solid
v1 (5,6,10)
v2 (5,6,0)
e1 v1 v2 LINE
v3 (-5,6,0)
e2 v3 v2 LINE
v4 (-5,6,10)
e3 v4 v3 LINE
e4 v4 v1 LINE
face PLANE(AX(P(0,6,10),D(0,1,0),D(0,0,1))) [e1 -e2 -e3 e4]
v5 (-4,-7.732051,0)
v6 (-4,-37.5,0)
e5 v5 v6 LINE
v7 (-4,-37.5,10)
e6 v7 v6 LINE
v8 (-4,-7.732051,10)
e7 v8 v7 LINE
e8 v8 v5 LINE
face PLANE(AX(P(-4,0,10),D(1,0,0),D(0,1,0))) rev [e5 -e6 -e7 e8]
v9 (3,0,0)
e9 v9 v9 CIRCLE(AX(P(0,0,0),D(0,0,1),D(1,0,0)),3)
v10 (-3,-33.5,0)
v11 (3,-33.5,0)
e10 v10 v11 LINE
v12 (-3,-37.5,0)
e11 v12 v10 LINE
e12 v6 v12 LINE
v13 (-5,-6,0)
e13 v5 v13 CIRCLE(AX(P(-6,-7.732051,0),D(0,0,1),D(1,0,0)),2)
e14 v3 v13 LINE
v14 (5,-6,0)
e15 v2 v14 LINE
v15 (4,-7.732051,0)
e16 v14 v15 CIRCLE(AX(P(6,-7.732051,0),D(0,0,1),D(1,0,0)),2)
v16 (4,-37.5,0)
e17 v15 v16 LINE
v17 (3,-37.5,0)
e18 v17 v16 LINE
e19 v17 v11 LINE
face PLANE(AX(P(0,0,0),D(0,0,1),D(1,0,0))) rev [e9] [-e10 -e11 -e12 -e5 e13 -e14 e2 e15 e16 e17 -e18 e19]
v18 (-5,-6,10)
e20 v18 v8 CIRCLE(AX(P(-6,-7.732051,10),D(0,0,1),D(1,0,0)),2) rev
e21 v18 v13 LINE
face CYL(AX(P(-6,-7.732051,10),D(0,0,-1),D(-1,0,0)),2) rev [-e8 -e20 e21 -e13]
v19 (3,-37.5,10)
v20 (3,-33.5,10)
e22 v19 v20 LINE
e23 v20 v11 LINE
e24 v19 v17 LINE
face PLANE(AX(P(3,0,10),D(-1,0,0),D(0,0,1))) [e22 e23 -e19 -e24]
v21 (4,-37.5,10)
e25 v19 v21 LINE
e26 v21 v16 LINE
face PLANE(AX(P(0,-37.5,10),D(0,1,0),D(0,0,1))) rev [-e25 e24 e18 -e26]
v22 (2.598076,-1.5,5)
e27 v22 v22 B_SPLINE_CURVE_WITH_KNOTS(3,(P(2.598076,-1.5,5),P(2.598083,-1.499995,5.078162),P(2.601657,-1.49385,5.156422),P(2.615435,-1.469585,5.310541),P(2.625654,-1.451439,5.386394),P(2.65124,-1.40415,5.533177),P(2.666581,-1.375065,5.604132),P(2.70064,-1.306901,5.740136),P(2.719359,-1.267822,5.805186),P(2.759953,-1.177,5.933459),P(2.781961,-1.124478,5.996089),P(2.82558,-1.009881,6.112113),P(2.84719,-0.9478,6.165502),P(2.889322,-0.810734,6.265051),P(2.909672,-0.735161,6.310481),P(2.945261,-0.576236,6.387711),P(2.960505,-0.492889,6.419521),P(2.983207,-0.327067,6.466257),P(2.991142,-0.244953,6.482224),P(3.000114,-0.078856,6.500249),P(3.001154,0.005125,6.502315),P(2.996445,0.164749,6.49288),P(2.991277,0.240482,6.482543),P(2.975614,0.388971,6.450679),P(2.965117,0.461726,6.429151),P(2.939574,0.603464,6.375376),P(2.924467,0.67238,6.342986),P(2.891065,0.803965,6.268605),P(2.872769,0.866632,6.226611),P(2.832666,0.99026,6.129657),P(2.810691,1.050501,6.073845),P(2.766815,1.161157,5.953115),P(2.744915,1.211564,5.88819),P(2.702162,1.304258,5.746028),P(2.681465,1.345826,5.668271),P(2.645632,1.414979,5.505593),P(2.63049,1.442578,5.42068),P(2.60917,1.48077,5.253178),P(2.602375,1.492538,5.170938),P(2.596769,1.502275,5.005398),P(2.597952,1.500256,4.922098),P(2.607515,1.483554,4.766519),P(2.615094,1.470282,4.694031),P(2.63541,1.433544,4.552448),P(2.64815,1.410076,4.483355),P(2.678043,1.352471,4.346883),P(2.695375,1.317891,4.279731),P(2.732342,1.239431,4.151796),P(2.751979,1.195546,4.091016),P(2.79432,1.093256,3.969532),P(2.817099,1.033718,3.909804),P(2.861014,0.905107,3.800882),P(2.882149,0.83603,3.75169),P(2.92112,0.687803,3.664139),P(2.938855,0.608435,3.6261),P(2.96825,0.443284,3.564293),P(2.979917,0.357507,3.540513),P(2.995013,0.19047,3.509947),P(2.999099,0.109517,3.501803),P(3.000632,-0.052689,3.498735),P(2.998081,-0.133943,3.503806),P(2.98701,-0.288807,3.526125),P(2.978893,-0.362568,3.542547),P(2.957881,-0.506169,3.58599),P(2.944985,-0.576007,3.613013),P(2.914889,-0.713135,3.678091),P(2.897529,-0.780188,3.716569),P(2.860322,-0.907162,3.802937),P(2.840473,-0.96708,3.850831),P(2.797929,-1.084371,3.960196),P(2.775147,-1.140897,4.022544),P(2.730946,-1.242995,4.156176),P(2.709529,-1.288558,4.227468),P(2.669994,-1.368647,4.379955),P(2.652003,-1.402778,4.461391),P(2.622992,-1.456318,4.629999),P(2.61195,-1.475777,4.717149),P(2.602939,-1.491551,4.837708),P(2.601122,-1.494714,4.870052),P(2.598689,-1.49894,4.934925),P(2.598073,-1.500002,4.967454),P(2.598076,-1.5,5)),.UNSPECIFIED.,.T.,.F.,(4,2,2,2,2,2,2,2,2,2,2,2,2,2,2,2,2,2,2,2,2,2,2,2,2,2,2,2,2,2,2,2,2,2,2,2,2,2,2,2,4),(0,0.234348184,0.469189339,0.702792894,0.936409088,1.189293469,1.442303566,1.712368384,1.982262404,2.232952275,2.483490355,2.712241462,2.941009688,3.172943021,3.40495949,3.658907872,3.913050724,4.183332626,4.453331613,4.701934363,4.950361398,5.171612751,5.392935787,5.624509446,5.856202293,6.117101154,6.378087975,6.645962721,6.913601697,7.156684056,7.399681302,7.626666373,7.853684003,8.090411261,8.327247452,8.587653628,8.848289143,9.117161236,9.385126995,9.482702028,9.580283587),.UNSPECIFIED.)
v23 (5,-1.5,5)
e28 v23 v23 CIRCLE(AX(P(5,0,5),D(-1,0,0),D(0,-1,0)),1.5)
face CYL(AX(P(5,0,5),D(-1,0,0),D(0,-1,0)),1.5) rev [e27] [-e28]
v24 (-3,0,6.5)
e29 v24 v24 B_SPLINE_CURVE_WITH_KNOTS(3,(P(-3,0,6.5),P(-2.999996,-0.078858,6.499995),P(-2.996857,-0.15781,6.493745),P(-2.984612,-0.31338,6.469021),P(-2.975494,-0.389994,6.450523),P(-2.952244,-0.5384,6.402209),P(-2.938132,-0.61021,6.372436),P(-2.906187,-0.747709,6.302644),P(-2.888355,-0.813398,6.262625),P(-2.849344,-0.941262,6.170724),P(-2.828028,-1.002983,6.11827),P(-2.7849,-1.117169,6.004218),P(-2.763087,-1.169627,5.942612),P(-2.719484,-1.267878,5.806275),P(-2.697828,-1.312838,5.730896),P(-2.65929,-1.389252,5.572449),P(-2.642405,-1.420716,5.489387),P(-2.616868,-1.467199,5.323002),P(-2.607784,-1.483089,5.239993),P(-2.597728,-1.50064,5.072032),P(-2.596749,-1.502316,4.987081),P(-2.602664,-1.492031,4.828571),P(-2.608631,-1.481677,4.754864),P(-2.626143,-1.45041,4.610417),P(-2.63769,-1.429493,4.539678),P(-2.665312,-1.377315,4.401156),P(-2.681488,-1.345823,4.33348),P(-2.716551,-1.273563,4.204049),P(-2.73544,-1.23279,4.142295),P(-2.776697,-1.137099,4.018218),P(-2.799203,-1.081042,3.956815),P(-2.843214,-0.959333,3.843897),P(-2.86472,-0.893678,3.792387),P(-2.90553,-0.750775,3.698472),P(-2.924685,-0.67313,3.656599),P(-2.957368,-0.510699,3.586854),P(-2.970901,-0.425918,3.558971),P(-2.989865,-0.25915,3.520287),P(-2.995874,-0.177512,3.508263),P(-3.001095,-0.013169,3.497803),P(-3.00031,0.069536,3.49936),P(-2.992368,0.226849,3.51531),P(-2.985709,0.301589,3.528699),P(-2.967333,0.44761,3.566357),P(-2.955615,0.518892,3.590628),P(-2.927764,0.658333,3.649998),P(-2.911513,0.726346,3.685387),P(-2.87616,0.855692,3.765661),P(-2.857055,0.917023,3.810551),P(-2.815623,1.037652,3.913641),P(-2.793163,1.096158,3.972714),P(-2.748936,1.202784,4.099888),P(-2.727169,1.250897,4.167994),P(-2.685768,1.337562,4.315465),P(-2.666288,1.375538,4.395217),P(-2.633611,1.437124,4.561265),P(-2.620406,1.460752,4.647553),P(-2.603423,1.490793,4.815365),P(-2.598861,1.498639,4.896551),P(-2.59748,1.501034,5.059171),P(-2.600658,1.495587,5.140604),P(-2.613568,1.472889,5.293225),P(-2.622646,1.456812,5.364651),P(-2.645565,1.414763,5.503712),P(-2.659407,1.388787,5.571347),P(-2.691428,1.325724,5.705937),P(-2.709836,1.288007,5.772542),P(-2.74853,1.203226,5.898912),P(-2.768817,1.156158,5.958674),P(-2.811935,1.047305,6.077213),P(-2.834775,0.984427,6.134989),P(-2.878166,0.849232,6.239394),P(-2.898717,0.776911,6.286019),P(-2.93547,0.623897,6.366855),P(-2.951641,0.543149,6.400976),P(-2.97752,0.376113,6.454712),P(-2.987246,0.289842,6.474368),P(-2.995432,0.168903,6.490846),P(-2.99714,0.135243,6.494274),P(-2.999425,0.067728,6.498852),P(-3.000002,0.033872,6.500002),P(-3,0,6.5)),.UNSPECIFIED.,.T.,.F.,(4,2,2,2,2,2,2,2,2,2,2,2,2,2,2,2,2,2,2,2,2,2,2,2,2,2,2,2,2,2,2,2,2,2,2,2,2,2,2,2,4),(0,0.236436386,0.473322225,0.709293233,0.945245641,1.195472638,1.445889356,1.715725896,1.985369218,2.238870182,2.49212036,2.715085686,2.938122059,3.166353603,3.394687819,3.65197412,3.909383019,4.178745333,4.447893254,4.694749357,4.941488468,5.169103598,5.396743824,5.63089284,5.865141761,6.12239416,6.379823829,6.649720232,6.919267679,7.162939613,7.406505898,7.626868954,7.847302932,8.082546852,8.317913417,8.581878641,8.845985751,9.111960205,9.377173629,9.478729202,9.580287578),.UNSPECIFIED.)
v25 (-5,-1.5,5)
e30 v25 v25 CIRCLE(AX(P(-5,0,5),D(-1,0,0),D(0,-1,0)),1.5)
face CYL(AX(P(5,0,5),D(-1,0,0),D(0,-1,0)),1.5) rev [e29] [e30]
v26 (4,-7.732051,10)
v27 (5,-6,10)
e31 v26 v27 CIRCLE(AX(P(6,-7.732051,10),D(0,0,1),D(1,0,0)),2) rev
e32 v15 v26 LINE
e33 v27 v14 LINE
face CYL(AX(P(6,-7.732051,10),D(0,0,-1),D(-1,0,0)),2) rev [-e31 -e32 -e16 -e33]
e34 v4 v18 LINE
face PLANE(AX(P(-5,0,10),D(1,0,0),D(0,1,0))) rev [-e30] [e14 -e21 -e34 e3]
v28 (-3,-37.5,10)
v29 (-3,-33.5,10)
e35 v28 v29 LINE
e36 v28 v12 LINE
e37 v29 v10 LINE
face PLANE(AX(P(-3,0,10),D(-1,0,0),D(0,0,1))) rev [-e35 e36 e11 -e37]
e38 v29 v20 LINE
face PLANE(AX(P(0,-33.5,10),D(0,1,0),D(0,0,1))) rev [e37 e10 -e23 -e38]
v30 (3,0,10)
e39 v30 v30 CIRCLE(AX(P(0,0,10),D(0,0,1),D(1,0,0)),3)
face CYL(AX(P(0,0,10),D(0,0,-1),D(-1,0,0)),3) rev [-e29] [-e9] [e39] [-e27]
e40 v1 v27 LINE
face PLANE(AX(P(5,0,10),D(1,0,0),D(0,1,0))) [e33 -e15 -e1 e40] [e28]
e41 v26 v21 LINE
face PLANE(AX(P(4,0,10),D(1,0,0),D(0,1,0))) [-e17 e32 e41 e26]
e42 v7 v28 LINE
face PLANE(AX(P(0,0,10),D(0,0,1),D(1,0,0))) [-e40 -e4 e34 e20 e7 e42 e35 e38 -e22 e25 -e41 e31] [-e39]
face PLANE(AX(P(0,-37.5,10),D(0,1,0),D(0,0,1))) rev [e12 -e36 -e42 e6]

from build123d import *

# Parameters (mm, degrees)
SKETCH1_W           = 10
SKETCH1_H           = 12
SKETCH1_R           = 3
BOSS_EXTRUDE1_DEPTH = 10
SKETCH2_R           = 1.5
CUT_EXTRUDE1_DEPTH  = 41.078048855
FILLET1_R           = 2


with BuildPart() as part:
    # Sketch1 → Boss-Extrude1 (new body)
    # profile 1 of 2: a face of its own
    with BuildSketch(Plane.XY):
        Rectangle(SKETCH1_W, SKETCH1_H)
        Circle(SKETCH1_R, mode=Mode.SUBTRACT)
    # profile 2 of 2: a face of its own
    with BuildSketch(Plane.XY):
        Polygon((-4, -6), (4, -6), (4, -37.5), (3, -37.5), (3, -33.5), (-3, -33.5), (-3, -37.5), (-4, -37.5), align=None)
    extrude(amount=BOSS_EXTRUDE1_DEPTH)

    # Sketch2 → Cut-Extrude1 (cut, through all)
    with BuildSketch(Plane.ZY.offset(5)):
        with Locations(Location((5, 0, 0), (0, 0, 270))):
            Circle(SKETCH2_R)
    extrude(amount=-CUT_EXTRUDE1_DEPTH, mode=Mode.SUBTRACT)

    # Fillet1
    # the kernel refuses this fillet: 2 mm, written as the material it adds along each edge
    with BuildSketch(Plane(origin=(4, -6, 0), x_dir=(1, 0, 0), z_dir=(0, 0, 1))) as fillet1_piece_1:
        with BuildLine():
            CenterArc((2, -1.732050808), FILLET1_R, 120, 60)
            Line((0, -1.732050808), (-0.04, -1.732050808))
            Line((-0.04, -1.732050808), (-0.04, 0))
            Line((-0.04, 0), (0, 0.04))
            ThreePointArc((0, 0.04), (0.5, 0.04), (0.98, 0.034641016))
            Line((0.98, 0.034641016), (1, 0))
        make_face()
    extrude(amount=10)
    with BuildSketch(Plane(origin=(-4, -6, 0), x_dir=(-1, 0, 0), z_dir=(0, 0, 1))) as fillet1_piece_2:
        with BuildLine():
            CenterArc((2, 1.732050808), FILLET1_R, 180, 60)
            Line((0, 1.732050808), (-0.04, 1.732050808))
            Line((-0.04, 1.732050808), (-0.04, 0))
            Line((-0.04, 0), (0, -0.04))
            ThreePointArc((0, -0.04), (0.5, -0.04), (0.98, -0.034641016))
            Line((0.98, -0.034641016), (1, 0))
        make_face()
    extrude(amount=10)


solid = part.part
